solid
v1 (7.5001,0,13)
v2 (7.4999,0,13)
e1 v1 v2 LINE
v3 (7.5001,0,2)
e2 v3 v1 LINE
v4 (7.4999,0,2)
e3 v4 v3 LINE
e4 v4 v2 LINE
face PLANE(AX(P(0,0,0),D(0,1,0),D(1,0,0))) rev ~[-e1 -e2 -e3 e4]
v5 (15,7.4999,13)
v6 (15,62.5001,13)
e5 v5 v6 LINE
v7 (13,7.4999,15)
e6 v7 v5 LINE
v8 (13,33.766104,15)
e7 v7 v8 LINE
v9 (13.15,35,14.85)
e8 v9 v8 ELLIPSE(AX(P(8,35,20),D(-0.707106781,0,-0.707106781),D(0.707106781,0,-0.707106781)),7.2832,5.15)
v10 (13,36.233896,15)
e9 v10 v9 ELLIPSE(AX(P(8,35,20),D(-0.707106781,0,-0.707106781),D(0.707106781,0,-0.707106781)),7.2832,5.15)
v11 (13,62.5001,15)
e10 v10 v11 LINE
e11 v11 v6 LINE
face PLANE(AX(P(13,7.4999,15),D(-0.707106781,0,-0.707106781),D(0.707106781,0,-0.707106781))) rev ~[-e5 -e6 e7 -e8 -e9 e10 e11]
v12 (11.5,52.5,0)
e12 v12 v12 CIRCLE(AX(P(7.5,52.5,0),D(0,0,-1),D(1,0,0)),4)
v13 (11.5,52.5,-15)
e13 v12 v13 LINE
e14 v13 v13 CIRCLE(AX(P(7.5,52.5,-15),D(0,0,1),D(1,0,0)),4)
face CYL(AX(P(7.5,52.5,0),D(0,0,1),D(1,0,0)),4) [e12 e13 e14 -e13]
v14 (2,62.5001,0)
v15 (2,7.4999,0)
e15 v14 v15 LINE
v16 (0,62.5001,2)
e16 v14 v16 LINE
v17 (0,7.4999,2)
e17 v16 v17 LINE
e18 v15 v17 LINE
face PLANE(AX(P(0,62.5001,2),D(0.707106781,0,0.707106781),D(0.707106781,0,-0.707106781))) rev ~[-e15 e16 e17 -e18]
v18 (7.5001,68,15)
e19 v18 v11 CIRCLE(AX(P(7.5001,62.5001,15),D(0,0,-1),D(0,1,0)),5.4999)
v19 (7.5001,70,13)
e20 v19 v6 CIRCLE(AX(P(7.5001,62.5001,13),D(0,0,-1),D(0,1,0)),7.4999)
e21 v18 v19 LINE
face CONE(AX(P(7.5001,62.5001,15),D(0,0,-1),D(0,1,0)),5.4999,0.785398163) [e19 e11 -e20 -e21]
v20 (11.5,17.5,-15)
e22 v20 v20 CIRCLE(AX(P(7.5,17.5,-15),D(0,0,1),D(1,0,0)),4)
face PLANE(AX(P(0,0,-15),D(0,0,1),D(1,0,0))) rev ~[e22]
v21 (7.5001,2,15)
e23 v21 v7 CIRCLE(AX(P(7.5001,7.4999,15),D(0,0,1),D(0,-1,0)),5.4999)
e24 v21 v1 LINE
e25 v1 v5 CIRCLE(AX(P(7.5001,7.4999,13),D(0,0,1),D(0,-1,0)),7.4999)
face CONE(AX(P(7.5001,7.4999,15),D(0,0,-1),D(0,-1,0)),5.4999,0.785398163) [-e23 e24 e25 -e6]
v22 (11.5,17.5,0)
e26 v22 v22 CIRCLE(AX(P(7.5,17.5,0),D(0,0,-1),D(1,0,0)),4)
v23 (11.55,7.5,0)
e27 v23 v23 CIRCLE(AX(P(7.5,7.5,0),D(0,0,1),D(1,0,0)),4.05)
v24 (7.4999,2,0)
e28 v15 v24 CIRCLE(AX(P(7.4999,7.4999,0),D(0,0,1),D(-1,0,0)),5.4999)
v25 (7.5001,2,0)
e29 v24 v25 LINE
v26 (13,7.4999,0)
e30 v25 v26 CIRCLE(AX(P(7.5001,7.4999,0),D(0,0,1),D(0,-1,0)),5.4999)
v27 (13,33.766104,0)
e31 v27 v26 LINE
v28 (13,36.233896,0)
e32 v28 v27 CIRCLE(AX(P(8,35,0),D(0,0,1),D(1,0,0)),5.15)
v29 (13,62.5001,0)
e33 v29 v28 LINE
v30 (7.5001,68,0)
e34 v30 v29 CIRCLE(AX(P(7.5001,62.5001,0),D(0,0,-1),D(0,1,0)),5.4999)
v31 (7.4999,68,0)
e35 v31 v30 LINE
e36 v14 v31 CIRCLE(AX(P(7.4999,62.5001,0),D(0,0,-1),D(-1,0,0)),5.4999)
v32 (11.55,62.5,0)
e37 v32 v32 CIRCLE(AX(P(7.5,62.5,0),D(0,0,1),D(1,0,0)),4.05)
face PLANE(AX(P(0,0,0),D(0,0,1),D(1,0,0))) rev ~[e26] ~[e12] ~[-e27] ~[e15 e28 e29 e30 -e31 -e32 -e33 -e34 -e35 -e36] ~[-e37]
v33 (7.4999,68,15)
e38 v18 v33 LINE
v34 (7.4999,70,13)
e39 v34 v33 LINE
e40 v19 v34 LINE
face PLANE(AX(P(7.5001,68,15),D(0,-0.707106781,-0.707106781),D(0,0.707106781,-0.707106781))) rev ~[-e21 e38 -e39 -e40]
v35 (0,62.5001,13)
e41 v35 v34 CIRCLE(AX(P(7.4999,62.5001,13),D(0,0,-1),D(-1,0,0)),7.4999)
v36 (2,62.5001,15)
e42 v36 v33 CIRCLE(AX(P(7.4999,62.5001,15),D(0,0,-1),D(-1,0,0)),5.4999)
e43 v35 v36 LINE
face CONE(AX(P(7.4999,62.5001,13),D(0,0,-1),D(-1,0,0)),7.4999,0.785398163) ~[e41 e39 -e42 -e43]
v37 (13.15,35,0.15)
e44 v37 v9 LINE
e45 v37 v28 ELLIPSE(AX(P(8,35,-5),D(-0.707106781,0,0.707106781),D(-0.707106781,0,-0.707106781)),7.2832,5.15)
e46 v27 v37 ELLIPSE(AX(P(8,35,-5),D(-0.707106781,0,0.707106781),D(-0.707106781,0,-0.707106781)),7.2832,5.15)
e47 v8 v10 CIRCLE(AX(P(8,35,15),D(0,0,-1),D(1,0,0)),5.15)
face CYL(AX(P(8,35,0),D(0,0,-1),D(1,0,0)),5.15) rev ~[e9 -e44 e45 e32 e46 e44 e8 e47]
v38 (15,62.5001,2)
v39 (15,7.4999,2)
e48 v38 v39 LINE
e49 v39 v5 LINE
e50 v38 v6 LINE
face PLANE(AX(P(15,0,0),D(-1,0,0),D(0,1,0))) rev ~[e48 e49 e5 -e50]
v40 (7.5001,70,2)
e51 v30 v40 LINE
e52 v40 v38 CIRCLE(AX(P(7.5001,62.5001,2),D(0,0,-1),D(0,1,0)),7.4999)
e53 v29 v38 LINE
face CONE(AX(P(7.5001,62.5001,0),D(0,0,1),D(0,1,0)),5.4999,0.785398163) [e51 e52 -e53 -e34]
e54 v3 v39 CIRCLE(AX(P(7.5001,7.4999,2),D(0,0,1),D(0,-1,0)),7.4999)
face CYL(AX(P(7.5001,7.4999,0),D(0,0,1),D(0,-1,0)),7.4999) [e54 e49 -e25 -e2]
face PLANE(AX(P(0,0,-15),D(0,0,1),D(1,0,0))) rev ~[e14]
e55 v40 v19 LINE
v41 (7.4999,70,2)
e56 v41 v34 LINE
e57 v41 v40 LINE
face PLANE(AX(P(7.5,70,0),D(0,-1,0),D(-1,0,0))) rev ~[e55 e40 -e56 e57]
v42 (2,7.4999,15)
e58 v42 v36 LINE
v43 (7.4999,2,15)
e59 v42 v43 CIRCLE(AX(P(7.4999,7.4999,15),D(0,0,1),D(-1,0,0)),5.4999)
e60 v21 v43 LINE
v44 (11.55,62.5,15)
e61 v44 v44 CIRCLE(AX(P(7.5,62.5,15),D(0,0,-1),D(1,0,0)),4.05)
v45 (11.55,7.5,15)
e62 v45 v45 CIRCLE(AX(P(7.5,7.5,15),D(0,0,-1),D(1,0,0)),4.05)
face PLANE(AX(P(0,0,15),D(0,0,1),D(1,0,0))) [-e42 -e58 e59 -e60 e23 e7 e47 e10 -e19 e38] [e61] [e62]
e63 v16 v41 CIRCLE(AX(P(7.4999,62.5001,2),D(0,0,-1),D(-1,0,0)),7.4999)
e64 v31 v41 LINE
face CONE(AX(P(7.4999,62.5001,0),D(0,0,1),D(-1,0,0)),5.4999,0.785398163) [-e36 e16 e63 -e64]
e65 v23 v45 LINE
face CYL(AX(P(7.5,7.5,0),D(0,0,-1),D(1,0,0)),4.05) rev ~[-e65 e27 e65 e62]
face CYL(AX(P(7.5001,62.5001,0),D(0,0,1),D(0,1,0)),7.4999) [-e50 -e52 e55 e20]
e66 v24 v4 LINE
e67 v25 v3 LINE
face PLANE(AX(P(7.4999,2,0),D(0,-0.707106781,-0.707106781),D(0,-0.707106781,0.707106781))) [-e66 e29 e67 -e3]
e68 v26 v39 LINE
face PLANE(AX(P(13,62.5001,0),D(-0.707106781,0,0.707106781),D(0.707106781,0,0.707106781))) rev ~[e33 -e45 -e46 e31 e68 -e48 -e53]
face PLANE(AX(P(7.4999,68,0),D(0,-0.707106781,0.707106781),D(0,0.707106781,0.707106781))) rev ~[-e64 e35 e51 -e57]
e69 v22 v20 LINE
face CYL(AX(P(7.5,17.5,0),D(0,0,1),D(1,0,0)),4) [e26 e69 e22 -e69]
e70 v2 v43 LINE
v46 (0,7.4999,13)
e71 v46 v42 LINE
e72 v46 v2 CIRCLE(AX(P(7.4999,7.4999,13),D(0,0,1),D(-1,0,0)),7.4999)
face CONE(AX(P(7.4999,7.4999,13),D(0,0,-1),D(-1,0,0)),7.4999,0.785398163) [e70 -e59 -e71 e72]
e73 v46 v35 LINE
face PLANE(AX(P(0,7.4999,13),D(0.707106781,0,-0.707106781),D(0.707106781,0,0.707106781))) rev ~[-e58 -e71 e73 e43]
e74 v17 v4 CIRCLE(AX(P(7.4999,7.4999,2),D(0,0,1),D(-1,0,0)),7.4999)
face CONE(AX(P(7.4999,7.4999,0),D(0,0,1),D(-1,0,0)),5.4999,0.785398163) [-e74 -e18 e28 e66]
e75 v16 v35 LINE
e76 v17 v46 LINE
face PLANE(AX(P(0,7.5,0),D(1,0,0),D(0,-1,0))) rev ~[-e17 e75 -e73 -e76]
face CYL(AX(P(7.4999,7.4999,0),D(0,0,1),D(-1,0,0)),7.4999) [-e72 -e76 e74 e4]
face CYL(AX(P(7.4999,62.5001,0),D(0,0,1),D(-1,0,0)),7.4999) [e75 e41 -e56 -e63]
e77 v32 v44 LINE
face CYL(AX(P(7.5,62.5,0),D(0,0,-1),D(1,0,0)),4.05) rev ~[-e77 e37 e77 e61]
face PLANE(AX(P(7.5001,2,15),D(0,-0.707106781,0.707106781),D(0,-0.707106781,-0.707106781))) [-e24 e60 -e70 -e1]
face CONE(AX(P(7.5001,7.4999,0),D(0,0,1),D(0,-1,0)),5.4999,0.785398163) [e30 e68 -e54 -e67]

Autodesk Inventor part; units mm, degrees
ref_plane "YZ Plane" through (0, 0, 0) normal (1, 0, 0) x (0, 1, 0)
ref_plane "XZ Plane" through (0, 0, 0) normal (0, 1, 0) x (-1, 0, 0)
ref_plane "XY Plane" through (0, 0, 0) normal (0, 0, 1) x (1, 0, 0)
sketch "Sketch1" plane through (0, 0, 0) normal (0, 0, 1) x (1, 0, 0)
  line L0 (0, 0) -> (15, 0)
  line L1 (15, 0) -> (15, 70)
  line L2 (15, 70) -> (0, 70)
  line L3 (0, 70) -> (0, 0)
  line L4 (15, 35) -> (0, 35)
  line L5 (0, 60) -> (15, 60)
  line L6 (15, 60) -> (15, 10)
  line L7 (15, 10) -> (0, 10)
  line L8 (0, 10) -> (0, 60)
  line L9 (0, 60) -> (15, 10) construction
  line L10 (15, 60) -> (0, 10) construction
  line L11 (7.5, 35) -> (8, 35)
  circle A0 centre (8, 35) radius 5.15
  line L12 (0, 0) -> (15, 0)
  line L13 (15, 0) -> (15, 15)
  line L14 (15, 15) -> (0, 15) construction
  line L15 (0, 15) -> (0, 0)
  line L16 (0, 70) -> (15, 70)
  line L17 (15, 70) -> (15, 55)
  line L18 (15, 55) -> (0, 55) construction
  line L19 (0, 55) -> (0, 70)
  line L20 (15, 15) -> (0, 0) construction
  line L21 (0, 70) -> (15, 55) construction
  circle A1 centre (7.5, 7.5) radius 7.5
  circle A2 centre (7.5, 62.5) radius 7.5
  line L22 (0, 10) -> (15, 10)
  line L23 (15, 10) -> (15, 25)
  line L24 (15, 25) -> (0, 25)
  line L25 (0, 25) -> (0, 10)
  line L26 (15, 60) -> (0, 60)
  line L27 (0, 60) -> (0, 45)
  line L28 (0, 45) -> (15, 45)
  line L29 (15, 45) -> (15, 60)
  line L30 (0, 45) -> (15, 60) construction
  line L31 (0, 10) -> (15, 25) construction
  circle A3 centre (7.5, 17.5) radius 4
  circle A4 centre (7.5, 52.5) radius 4
  circle A5 centre (7.5, 7.5) radius 4.05
  circle A6 centre (7.5, 62.5) radius 4.05
  point P0 (15, 7.5)
  point P1 (15, 62.5)
  point P2 (0, 62.5)
  point P3 (0, 7.5)
  point P4 (7.5, 70)
  point P5 (7.5, 0)
  dimension "d0" = 15
  dimension "d1" = 70
  dimension "d2" = 15
  dimension "d3" = 50
  dimension "d5" = 0.5
  dimension "d6" = 10.3
  dimension "d7" = 15
  dimension "d8" = 15
  dimension "d9" = 15
  dimension "d10" = 15
  dimension "d11" = 15
  dimension "d12" = 15
  dimension "d13" = 15
  dimension "d14" = 15
  dimension "d15" = 8
  dimension "d16" = 8
  dimension "d26" = 8.1
  dimension "d27" = 8.1
extrude "Extrusion1" add sketch "Sketch1" against normal blind 15 contours A3 A1 | A1 A3 | A4 A2 | A2 A4
extrude "Extrusion2" add sketch "Sketch1" along normal blind 15 contours L3 A1 L0 | A1 L1 L0 | A1 L7 A5 | L3 L7 A1 | A1 L7 L1 | L3 L24 L1 L7 A1 A3 | A1 A3 L7 A5 | A3 A1 | A1 A3 | L3 L4 A0 L1 L24 | L3 L28 L1 L4 A0 | L3 L5 A2 A4 L1 L28 | L3 A2 L5 | L5 A2 L1 | L3 L2 A2 | A2 L5 A6 | L5 A6 A2 A4 | A2 L2 L1 | A4 A2 | A2 A4
fillet "Fillet2" radius 7.5 4 edges at (15, 0, 7.5) (0, 0, 7.5) (15, 70, 7.5) (0, 70, 7.5)
chamfer "Chamfer2" distance 2 angle 45 12 edges at (12.8033, 67.8033, 15) (12.8033, 2.1967, 15) (2.1967, 67.8033, 15) (2.1967, 2.1967, 15) (0, 35, 15) (15, 35, 15) (15, 35, 0) (12.8033, 67.8033, 0) (12.8033, 2.1967, 0) (2.1967, 67.8033, 0) (2.1967, 2.1967, 0) (0, 35, 0)
properties part number "Gear_Holder_1"
